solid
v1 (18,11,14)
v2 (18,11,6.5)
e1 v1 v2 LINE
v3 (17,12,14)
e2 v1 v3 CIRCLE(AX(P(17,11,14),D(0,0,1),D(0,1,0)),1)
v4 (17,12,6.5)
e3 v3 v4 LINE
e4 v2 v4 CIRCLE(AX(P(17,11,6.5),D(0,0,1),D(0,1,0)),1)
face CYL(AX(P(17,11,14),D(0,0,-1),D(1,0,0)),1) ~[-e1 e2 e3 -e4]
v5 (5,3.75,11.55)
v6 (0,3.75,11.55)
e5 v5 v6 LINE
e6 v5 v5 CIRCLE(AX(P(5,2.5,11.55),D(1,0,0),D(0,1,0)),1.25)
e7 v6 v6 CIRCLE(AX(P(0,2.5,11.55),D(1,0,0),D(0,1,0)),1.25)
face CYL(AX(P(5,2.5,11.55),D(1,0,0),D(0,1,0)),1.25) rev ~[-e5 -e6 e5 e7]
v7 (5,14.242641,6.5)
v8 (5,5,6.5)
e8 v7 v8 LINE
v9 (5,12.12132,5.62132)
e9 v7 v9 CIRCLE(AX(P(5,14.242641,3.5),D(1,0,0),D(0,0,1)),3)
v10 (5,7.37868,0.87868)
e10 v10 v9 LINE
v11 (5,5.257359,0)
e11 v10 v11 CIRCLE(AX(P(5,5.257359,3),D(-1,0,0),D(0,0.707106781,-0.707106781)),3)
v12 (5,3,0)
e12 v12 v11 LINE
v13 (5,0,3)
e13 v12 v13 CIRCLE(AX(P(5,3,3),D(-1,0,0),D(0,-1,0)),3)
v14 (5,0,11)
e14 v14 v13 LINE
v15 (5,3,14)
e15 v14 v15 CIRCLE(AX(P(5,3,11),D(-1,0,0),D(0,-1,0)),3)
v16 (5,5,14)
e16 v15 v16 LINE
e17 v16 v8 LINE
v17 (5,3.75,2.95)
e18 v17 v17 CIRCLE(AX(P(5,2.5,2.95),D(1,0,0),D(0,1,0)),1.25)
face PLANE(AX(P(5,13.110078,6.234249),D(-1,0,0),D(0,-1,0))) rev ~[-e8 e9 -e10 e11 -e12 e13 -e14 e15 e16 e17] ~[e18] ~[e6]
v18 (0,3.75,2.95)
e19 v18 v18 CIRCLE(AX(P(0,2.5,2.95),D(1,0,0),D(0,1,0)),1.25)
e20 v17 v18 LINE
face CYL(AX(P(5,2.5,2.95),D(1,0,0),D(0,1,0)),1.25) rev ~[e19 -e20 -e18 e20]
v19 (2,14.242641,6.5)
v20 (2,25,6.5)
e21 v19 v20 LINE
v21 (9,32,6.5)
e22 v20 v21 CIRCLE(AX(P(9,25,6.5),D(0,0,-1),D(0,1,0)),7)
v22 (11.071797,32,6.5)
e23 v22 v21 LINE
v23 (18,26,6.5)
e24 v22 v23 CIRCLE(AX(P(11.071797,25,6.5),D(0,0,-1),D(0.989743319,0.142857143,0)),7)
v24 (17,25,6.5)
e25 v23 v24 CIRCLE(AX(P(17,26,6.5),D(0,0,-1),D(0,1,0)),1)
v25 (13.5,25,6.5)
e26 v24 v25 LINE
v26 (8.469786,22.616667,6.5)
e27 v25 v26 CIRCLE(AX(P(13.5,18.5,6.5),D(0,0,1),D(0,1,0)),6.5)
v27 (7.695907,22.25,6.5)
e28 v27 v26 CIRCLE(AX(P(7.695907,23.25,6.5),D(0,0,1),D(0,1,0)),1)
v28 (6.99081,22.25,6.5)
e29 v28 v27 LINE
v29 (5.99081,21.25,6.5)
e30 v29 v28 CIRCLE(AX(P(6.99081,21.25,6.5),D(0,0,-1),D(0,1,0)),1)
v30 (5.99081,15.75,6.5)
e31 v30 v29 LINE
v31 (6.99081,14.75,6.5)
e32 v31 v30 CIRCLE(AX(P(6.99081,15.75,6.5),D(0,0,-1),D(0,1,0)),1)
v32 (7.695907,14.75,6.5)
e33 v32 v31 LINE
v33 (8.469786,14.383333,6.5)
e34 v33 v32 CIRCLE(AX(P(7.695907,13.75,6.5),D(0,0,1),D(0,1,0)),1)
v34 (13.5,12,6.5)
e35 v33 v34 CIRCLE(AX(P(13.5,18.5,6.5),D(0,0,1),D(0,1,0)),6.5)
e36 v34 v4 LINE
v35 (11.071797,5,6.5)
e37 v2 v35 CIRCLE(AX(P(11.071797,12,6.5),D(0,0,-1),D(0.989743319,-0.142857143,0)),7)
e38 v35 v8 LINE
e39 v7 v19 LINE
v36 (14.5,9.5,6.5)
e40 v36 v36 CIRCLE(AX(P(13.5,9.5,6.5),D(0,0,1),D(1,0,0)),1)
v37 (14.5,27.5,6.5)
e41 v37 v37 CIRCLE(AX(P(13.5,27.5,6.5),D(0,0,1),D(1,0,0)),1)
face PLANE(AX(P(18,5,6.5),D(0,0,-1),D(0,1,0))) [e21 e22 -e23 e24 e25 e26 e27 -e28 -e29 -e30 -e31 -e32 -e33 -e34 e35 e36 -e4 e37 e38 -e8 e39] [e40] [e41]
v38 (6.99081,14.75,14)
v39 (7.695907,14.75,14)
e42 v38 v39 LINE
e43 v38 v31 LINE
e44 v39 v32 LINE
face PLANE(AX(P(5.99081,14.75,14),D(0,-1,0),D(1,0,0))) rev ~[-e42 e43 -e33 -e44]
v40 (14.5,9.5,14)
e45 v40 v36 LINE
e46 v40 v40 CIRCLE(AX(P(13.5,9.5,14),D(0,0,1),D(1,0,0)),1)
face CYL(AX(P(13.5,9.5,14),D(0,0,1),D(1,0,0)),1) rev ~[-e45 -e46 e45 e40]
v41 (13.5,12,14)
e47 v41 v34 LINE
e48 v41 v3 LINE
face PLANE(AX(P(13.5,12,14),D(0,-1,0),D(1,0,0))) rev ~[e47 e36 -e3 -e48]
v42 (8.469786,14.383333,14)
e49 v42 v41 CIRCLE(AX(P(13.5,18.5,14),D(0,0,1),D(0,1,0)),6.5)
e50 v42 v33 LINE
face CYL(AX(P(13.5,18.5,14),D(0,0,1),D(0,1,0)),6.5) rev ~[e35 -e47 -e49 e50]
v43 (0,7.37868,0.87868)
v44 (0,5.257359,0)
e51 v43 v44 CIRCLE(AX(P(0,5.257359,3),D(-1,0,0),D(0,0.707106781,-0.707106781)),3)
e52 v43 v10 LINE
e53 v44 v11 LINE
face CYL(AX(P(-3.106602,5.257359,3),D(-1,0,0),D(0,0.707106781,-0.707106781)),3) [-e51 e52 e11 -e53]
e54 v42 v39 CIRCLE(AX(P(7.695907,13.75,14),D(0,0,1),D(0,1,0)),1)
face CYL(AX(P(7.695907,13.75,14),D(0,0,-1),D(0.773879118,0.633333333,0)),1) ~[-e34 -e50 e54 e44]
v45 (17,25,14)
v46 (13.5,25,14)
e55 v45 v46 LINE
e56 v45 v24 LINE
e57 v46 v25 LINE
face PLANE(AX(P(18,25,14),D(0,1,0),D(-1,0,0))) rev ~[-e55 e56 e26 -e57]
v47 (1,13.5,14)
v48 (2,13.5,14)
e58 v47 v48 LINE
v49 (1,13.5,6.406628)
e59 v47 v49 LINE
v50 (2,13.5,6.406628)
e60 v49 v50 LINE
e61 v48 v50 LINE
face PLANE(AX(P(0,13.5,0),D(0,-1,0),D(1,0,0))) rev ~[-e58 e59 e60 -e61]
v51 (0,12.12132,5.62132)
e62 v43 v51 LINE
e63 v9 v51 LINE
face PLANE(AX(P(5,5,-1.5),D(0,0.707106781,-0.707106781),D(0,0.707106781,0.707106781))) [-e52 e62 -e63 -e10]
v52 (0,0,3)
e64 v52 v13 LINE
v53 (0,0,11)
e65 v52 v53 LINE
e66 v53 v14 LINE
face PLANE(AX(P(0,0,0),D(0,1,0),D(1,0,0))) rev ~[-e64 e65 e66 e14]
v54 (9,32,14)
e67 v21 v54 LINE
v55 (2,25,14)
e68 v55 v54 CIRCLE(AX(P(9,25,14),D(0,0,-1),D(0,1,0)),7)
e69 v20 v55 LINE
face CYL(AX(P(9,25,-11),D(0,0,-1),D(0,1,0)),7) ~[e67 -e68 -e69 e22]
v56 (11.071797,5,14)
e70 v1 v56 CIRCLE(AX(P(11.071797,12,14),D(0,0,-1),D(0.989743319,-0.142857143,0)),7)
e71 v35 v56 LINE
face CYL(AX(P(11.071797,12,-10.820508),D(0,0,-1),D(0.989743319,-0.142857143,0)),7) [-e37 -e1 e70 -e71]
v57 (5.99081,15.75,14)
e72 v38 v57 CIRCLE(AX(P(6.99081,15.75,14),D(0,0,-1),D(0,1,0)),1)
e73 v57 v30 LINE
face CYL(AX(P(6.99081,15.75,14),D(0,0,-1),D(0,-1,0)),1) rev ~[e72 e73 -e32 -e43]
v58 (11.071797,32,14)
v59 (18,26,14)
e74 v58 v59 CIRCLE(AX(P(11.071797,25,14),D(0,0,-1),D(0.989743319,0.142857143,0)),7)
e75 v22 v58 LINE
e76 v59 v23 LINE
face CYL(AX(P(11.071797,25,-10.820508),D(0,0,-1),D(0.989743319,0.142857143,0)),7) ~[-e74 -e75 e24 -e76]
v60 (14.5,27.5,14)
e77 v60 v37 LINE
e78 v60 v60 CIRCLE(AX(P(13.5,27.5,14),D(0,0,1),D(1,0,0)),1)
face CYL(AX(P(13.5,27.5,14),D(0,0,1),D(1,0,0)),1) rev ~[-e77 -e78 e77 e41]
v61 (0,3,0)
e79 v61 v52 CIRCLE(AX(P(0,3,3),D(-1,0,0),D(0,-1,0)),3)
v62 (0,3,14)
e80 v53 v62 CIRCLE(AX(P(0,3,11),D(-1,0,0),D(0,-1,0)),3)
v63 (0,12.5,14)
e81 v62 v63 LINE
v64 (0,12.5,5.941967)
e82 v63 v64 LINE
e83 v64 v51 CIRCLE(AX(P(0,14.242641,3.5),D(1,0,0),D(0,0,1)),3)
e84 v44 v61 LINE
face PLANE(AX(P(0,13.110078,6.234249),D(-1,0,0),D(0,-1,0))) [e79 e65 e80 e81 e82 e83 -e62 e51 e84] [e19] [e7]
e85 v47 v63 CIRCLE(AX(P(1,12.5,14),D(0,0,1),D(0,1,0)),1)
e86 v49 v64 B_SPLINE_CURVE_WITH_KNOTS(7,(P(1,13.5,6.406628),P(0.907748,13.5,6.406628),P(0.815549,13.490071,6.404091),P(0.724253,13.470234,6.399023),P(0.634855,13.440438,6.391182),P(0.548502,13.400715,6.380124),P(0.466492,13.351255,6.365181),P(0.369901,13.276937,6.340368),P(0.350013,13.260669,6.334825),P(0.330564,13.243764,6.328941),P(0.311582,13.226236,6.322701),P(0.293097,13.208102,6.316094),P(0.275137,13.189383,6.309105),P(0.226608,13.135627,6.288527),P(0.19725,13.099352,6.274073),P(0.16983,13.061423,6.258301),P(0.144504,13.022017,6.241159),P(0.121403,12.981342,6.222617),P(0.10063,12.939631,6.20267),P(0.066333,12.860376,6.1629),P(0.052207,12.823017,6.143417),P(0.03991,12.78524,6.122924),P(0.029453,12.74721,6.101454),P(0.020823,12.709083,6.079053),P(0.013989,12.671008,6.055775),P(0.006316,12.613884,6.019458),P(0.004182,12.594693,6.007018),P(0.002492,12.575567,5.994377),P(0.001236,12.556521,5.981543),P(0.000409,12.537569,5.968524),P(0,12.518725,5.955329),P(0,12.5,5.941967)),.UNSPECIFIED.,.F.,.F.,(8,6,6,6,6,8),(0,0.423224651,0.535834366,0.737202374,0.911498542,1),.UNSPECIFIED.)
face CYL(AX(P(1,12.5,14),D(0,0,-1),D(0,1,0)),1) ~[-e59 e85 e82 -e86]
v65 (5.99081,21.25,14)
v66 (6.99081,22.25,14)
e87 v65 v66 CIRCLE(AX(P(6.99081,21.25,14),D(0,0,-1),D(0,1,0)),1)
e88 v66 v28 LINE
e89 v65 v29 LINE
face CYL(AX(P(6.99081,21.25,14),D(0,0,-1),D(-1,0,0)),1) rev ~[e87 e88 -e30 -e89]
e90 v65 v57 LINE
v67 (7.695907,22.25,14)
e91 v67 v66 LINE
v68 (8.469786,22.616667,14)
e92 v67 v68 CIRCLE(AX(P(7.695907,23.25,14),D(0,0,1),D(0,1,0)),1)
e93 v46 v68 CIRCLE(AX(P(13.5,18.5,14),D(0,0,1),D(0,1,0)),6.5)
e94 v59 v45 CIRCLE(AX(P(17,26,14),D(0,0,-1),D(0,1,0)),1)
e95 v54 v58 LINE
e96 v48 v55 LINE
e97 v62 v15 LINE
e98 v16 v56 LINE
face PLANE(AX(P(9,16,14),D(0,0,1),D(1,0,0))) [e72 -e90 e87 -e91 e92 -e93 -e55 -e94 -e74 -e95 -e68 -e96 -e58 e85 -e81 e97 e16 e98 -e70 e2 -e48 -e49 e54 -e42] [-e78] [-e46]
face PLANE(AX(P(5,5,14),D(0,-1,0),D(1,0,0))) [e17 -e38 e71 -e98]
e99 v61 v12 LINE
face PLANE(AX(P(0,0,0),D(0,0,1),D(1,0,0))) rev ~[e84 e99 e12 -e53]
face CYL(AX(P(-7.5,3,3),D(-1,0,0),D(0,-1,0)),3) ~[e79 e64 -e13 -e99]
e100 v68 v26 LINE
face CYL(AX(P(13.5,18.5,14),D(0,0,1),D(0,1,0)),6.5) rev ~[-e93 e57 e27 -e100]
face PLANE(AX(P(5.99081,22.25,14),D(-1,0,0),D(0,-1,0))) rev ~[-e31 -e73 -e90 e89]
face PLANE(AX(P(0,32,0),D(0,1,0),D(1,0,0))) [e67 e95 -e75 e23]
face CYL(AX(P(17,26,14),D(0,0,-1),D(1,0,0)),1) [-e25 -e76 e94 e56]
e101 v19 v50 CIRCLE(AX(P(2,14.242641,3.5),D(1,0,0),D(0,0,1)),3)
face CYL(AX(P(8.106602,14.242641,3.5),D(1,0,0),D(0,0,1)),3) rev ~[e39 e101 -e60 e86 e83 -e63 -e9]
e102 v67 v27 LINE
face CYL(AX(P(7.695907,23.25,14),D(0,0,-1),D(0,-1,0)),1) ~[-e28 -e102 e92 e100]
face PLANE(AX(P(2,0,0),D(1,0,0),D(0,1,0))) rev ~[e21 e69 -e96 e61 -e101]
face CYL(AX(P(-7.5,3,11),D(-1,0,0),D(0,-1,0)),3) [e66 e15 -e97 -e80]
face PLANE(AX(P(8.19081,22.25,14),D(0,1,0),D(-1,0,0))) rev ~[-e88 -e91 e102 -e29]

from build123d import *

# Parameters (mm, degrees)
F0_W          = 18
F0_H          = 32
F1_DEPTH      = 14
F2_W          = 13
F2_H          = 5
F2_W_2        = 2
F2_H_2        = 18.5
F3_DEPTH      = 14
F4_W          = 27
F4_H          = 6.5
F5_DEPTH      = 18.001
F6_R          = 1
F7_DEPTH      = 7.5
F8_R          = 1.25
F9_DEPTH      = 5
F10_T4_DEPTH  = 5
F11_T4_DEPTH  = 8.1066017178
F11_T9_DEPTH  = 8.1066017178
F11_T12_DEPTH = 20
F11_T14_DEPTH = 11.2132034356
F12_R         = 1
F13_T1_DEPTH  = 42.1410161514
F13_T3_DEPTH  = 42.5
F15_DEPTH     = 14.001
F16_R         = 1


# Not quite as in the source:
# - a fillet or chamfer that OpenCascade refuses, or shapes differently, is made with other operations: its cross-section is extruded or revolved along the edge and cut away or added


with BuildPart() as f1:
    # F0 (on Top) → F1 (new body)
    with BuildSketch(Plane.XY):
        with Locations((9, 16)):
            Rectangle(F0_W, F0_H)
    extrude(amount=F1_DEPTH)

    # F2 (on face) → F3 (cut, through all)
    with BuildSketch(Plane.XY.offset(14)):
        with Locations((11.5, 2.5)):
            Rectangle(F2_W, F2_H)
        with Locations((1, 22.75)):
            Rectangle(F2_W_2, F2_H_2)
    extrude(amount=-F3_DEPTH, mode=Mode.SUBTRACT)

    # F4 (on face) → F5 (cut, through all)
    with BuildSketch(Plane.YZ.offset(18)):
        with Locations((18.5, 3.25)):
            Rectangle(F4_W, F4_H)
    extrude(amount=-F5_DEPTH, mode=Mode.SUBTRACT)

    # F6 (on face) → F7 (cut, through all)
    with BuildSketch(Plane.XY.offset(14)):
        with Locations((13.5, 9.5)):
            Circle(F6_R)
        with BuildLine():
            ThreePointArc((18, 23.1904157598), (15.9251079936, 24.5306592691), (13.5, 25))
            ThreePointArc((13.5, 25), (7, 18.5), (13.5, 12))
            ThreePointArc((13.5, 12), (15.9251079936, 12.4693407309), (18, 13.8095842402))
            Line((18, 13.8095842402), (18, 23.1904157598))
        make_face()
        with Locations((13.5, 27.5)):
            Circle(F6_R)
        with BuildLine():
            Line((18, 25), (13.5, 25))
            ThreePointArc((13.5, 25), (15.9251079936, 24.5306592691), (18, 23.1904157598))
            Line((18, 23.1904157598), (18, 25))
        make_face()
        with BuildLine():
            ThreePointArc((18, 13.8095842402), (15.9251079936, 12.4693407309), (13.5, 12))
            Line((13.5, 12), (18, 12))
            Line((18, 12), (18, 13.8095842402))
        make_face()
    extrude(amount=-F7_DEPTH, mode=Mode.SUBTRACT)

    # F8 (on face) → F9 (cut, through all)
    with BuildSketch(Plane.YZ.offset(5)):
        with Locations((2.5, 11.55)):
            Circle(F8_R)
        with Locations((2.5, 2.95)):
            Circle(F8_R)
    extrude(amount=-F9_DEPTH, mode=Mode.SUBTRACT)

    # F10: chamfer of 8 on 1 edges, made by hand


with BuildPart() as f10_tool2:
    # F10_s3 → F10_t4 (new body)
    with BuildSketch(Plane.YZ.offset(5)):
        Polygon((5, -1.5), (13, 6.5), (5, 6.5), align=None)
    extrude(amount=-F10_T4_DEPTH)

    split(bisect_by=Plane.XY, keep=Keep.TOP)


with BuildPart() as f1_1:
    add(f1.part)

    # F10_t1: union F10_tool2
    add(f10_tool2.part)

    # F11: fillet of radius 3 on 5 edges, made by hand


with BuildPart() as f11_tool2:
    # F11_s3 → F11_t4 (new body)
    with BuildSketch(Plane.YZ.offset(5)):
        with BuildLine():
            ThreePointArc((14.2426406871, 6.5), (13.09459039, 6.2716385975), (12.1213203436, 5.6213203436))
            Line((12.1213203436, 5.6213203436), (13, 6.5))
            Line((13, 6.5), (14.2426406871, 6.5))
        make_face()
    extrude(amount=-F11_T4_DEPTH)

    split(bisect_by=Plane.YZ.offset(2), keep=Keep.TOP)


with BuildPart() as f1_2:
    add(f1_1.part)

    # F11_t1: union F11_tool2
    add(f11_tool2.part)


with BuildPart() as f11_tool7:
    # F11_s8 → F11_t9 (new body)
    with BuildSketch(Plane.YZ.offset(8.1066017178)):
        with BuildLine():
            ThreePointArc((14.2426406871, 6.5), (13.09459039, 6.2716385975), (12.1213203436, 5.6213203436))
            Line((12.1213203436, 5.6213203436), (13, 6.5))
            Line((13, 6.5), (14.2426406871, 6.5))
        make_face()
    extrude(amount=-F11_T9_DEPTH)

    split(bisect_by=Plane.YZ.offset(2), keep=Keep.BOTTOM)

    split(bisect_by=Plane.XZ.offset(-13.5), keep=Keep.TOP)


with BuildPart() as f1_3:
    add(f1_2.part)

    # F11_t6: union F11_tool7
    add(f11_tool7.part)

    # F11_s13 → F11_t12 (cut)
    with BuildSketch(Plane.YZ.offset(-7.5)):
        with BuildLine():
            ThreePointArc((0, 11), (0.8786796564, 13.1213203436), (3, 14))
            Line((3, 14), (0, 14))
            Line((0, 14), (0, 11))
        make_face()
        with BuildLine():
            ThreePointArc((0, 3), (0.8786796564, 0.8786796564), (3, 0))
            Line((3, 0), (0, 0))
            Line((0, 0), (0, 3))
        make_face()
    extrude(amount=F11_T12_DEPTH, mode=Mode.SUBTRACT)

    # F11_s15 → F11_t14 (cut)
    with BuildSketch(Plane.YZ.offset(-3.1066017178)):
        with BuildLine():
            ThreePointArc((7.3786796564, 0.8786796564), (6.40540961, 0.2283614025), (5.2573593129, 0))
            Line((5.2573593129, 0), (6.5, 0))
            Line((6.5, 0), (7.3786796564, 0.8786796564))
        make_face()
    extrude(amount=F11_T14_DEPTH, mode=Mode.SUBTRACT)

    # F12
    f12_edges = [f1_3.edges().sort_by_distance(p)[0] for p in [
        (18, 12, 10.25),
        (18, 25, 10.25),
    ]]
    fillet(f12_edges, radius=F12_R)

    # F13: fillet of radius 7 on 3 edges, made by hand

    # F13_s2 → F13_t1 (cut)
    with BuildSketch(Plane.XY.offset(-10.8205080757)):
        with BuildLine():
            ThreePointArc((18, 11), (15.6543724647, 6.7084973779), (11.0717967697, 5))
            Line((11.0717967697, 5), (11.0717967697, 4.86))
            Line((11.0717967697, 4.86), (18, 4.86))
            Line((18, 4.86), (18.14, 5))
            ThreePointArc((18.14, 5), (18.14, 8), (18.1385640646, 10.98))
            Line((18.1385640646, 10.98), (18, 11))
        make_face()
        with BuildLine():
            ThreePointArc((18, 26), (15.6543724647, 30.2915026221), (11.0717967697, 32))
            Line((11.0717967697, 32), (11.0717967697, 32.14))
            Line((11.0717967697, 32.14), (18, 32.14))
            Line((18, 32.14), (18.14, 32))
            ThreePointArc((18.14, 32), (18.14, 29), (18.1385640646, 26.02))
            Line((18.1385640646, 26.02), (18, 26))
        make_face()
    extrude(amount=F13_T1_DEPTH, mode=Mode.SUBTRACT)

    # F13_s4 → F13_t3 (cut)
    with BuildSketch(Plane.XY.offset(-11)):
        with BuildLine():
            ThreePointArc((9, 32), (4.0502525317, 29.9497474683), (2, 25))
            Line((2, 25), (1.86, 25))
            Line((1.86, 25), (1.86, 32.14))
            Line((1.86, 32.14), (9, 32.14))
            Line((9, 32.14), (9, 32))
        make_face()
    extrude(amount=F13_T3_DEPTH, mode=Mode.SUBTRACT)

    # F14 (on face) → F15 (cut, through all)
    with BuildSketch(Plane.XY.offset(14)):
        with BuildLine():
            ThreePointArc((8.1908098546, 14.75), (7, 18.5), (8.1908098546, 22.25))
            Line((8.1908098546, 22.25), (5.9908098546, 22.25))
            Line((5.9908098546, 22.25), (5.9908098546, 14.75))
            Line((5.9908098546, 14.75), (8.1908098546, 14.75))
        make_face()
    extrude(amount=-F15_DEPTH, mode=Mode.SUBTRACT)

    # F16
    f16_edges = [f1_3.edges().sort_by_distance(p)[0] for p in [
        (5.99081, 14.75, 10.25),
        (5.99081, 22.25, 10.25),
        (8.19081, 22.25, 10.25),
        (8.19081, 14.75, 10.25),
        (0, 13.5, 10.203314),
    ]]
    fillet(f16_edges, radius=F16_R)


solid = f1_3.part
